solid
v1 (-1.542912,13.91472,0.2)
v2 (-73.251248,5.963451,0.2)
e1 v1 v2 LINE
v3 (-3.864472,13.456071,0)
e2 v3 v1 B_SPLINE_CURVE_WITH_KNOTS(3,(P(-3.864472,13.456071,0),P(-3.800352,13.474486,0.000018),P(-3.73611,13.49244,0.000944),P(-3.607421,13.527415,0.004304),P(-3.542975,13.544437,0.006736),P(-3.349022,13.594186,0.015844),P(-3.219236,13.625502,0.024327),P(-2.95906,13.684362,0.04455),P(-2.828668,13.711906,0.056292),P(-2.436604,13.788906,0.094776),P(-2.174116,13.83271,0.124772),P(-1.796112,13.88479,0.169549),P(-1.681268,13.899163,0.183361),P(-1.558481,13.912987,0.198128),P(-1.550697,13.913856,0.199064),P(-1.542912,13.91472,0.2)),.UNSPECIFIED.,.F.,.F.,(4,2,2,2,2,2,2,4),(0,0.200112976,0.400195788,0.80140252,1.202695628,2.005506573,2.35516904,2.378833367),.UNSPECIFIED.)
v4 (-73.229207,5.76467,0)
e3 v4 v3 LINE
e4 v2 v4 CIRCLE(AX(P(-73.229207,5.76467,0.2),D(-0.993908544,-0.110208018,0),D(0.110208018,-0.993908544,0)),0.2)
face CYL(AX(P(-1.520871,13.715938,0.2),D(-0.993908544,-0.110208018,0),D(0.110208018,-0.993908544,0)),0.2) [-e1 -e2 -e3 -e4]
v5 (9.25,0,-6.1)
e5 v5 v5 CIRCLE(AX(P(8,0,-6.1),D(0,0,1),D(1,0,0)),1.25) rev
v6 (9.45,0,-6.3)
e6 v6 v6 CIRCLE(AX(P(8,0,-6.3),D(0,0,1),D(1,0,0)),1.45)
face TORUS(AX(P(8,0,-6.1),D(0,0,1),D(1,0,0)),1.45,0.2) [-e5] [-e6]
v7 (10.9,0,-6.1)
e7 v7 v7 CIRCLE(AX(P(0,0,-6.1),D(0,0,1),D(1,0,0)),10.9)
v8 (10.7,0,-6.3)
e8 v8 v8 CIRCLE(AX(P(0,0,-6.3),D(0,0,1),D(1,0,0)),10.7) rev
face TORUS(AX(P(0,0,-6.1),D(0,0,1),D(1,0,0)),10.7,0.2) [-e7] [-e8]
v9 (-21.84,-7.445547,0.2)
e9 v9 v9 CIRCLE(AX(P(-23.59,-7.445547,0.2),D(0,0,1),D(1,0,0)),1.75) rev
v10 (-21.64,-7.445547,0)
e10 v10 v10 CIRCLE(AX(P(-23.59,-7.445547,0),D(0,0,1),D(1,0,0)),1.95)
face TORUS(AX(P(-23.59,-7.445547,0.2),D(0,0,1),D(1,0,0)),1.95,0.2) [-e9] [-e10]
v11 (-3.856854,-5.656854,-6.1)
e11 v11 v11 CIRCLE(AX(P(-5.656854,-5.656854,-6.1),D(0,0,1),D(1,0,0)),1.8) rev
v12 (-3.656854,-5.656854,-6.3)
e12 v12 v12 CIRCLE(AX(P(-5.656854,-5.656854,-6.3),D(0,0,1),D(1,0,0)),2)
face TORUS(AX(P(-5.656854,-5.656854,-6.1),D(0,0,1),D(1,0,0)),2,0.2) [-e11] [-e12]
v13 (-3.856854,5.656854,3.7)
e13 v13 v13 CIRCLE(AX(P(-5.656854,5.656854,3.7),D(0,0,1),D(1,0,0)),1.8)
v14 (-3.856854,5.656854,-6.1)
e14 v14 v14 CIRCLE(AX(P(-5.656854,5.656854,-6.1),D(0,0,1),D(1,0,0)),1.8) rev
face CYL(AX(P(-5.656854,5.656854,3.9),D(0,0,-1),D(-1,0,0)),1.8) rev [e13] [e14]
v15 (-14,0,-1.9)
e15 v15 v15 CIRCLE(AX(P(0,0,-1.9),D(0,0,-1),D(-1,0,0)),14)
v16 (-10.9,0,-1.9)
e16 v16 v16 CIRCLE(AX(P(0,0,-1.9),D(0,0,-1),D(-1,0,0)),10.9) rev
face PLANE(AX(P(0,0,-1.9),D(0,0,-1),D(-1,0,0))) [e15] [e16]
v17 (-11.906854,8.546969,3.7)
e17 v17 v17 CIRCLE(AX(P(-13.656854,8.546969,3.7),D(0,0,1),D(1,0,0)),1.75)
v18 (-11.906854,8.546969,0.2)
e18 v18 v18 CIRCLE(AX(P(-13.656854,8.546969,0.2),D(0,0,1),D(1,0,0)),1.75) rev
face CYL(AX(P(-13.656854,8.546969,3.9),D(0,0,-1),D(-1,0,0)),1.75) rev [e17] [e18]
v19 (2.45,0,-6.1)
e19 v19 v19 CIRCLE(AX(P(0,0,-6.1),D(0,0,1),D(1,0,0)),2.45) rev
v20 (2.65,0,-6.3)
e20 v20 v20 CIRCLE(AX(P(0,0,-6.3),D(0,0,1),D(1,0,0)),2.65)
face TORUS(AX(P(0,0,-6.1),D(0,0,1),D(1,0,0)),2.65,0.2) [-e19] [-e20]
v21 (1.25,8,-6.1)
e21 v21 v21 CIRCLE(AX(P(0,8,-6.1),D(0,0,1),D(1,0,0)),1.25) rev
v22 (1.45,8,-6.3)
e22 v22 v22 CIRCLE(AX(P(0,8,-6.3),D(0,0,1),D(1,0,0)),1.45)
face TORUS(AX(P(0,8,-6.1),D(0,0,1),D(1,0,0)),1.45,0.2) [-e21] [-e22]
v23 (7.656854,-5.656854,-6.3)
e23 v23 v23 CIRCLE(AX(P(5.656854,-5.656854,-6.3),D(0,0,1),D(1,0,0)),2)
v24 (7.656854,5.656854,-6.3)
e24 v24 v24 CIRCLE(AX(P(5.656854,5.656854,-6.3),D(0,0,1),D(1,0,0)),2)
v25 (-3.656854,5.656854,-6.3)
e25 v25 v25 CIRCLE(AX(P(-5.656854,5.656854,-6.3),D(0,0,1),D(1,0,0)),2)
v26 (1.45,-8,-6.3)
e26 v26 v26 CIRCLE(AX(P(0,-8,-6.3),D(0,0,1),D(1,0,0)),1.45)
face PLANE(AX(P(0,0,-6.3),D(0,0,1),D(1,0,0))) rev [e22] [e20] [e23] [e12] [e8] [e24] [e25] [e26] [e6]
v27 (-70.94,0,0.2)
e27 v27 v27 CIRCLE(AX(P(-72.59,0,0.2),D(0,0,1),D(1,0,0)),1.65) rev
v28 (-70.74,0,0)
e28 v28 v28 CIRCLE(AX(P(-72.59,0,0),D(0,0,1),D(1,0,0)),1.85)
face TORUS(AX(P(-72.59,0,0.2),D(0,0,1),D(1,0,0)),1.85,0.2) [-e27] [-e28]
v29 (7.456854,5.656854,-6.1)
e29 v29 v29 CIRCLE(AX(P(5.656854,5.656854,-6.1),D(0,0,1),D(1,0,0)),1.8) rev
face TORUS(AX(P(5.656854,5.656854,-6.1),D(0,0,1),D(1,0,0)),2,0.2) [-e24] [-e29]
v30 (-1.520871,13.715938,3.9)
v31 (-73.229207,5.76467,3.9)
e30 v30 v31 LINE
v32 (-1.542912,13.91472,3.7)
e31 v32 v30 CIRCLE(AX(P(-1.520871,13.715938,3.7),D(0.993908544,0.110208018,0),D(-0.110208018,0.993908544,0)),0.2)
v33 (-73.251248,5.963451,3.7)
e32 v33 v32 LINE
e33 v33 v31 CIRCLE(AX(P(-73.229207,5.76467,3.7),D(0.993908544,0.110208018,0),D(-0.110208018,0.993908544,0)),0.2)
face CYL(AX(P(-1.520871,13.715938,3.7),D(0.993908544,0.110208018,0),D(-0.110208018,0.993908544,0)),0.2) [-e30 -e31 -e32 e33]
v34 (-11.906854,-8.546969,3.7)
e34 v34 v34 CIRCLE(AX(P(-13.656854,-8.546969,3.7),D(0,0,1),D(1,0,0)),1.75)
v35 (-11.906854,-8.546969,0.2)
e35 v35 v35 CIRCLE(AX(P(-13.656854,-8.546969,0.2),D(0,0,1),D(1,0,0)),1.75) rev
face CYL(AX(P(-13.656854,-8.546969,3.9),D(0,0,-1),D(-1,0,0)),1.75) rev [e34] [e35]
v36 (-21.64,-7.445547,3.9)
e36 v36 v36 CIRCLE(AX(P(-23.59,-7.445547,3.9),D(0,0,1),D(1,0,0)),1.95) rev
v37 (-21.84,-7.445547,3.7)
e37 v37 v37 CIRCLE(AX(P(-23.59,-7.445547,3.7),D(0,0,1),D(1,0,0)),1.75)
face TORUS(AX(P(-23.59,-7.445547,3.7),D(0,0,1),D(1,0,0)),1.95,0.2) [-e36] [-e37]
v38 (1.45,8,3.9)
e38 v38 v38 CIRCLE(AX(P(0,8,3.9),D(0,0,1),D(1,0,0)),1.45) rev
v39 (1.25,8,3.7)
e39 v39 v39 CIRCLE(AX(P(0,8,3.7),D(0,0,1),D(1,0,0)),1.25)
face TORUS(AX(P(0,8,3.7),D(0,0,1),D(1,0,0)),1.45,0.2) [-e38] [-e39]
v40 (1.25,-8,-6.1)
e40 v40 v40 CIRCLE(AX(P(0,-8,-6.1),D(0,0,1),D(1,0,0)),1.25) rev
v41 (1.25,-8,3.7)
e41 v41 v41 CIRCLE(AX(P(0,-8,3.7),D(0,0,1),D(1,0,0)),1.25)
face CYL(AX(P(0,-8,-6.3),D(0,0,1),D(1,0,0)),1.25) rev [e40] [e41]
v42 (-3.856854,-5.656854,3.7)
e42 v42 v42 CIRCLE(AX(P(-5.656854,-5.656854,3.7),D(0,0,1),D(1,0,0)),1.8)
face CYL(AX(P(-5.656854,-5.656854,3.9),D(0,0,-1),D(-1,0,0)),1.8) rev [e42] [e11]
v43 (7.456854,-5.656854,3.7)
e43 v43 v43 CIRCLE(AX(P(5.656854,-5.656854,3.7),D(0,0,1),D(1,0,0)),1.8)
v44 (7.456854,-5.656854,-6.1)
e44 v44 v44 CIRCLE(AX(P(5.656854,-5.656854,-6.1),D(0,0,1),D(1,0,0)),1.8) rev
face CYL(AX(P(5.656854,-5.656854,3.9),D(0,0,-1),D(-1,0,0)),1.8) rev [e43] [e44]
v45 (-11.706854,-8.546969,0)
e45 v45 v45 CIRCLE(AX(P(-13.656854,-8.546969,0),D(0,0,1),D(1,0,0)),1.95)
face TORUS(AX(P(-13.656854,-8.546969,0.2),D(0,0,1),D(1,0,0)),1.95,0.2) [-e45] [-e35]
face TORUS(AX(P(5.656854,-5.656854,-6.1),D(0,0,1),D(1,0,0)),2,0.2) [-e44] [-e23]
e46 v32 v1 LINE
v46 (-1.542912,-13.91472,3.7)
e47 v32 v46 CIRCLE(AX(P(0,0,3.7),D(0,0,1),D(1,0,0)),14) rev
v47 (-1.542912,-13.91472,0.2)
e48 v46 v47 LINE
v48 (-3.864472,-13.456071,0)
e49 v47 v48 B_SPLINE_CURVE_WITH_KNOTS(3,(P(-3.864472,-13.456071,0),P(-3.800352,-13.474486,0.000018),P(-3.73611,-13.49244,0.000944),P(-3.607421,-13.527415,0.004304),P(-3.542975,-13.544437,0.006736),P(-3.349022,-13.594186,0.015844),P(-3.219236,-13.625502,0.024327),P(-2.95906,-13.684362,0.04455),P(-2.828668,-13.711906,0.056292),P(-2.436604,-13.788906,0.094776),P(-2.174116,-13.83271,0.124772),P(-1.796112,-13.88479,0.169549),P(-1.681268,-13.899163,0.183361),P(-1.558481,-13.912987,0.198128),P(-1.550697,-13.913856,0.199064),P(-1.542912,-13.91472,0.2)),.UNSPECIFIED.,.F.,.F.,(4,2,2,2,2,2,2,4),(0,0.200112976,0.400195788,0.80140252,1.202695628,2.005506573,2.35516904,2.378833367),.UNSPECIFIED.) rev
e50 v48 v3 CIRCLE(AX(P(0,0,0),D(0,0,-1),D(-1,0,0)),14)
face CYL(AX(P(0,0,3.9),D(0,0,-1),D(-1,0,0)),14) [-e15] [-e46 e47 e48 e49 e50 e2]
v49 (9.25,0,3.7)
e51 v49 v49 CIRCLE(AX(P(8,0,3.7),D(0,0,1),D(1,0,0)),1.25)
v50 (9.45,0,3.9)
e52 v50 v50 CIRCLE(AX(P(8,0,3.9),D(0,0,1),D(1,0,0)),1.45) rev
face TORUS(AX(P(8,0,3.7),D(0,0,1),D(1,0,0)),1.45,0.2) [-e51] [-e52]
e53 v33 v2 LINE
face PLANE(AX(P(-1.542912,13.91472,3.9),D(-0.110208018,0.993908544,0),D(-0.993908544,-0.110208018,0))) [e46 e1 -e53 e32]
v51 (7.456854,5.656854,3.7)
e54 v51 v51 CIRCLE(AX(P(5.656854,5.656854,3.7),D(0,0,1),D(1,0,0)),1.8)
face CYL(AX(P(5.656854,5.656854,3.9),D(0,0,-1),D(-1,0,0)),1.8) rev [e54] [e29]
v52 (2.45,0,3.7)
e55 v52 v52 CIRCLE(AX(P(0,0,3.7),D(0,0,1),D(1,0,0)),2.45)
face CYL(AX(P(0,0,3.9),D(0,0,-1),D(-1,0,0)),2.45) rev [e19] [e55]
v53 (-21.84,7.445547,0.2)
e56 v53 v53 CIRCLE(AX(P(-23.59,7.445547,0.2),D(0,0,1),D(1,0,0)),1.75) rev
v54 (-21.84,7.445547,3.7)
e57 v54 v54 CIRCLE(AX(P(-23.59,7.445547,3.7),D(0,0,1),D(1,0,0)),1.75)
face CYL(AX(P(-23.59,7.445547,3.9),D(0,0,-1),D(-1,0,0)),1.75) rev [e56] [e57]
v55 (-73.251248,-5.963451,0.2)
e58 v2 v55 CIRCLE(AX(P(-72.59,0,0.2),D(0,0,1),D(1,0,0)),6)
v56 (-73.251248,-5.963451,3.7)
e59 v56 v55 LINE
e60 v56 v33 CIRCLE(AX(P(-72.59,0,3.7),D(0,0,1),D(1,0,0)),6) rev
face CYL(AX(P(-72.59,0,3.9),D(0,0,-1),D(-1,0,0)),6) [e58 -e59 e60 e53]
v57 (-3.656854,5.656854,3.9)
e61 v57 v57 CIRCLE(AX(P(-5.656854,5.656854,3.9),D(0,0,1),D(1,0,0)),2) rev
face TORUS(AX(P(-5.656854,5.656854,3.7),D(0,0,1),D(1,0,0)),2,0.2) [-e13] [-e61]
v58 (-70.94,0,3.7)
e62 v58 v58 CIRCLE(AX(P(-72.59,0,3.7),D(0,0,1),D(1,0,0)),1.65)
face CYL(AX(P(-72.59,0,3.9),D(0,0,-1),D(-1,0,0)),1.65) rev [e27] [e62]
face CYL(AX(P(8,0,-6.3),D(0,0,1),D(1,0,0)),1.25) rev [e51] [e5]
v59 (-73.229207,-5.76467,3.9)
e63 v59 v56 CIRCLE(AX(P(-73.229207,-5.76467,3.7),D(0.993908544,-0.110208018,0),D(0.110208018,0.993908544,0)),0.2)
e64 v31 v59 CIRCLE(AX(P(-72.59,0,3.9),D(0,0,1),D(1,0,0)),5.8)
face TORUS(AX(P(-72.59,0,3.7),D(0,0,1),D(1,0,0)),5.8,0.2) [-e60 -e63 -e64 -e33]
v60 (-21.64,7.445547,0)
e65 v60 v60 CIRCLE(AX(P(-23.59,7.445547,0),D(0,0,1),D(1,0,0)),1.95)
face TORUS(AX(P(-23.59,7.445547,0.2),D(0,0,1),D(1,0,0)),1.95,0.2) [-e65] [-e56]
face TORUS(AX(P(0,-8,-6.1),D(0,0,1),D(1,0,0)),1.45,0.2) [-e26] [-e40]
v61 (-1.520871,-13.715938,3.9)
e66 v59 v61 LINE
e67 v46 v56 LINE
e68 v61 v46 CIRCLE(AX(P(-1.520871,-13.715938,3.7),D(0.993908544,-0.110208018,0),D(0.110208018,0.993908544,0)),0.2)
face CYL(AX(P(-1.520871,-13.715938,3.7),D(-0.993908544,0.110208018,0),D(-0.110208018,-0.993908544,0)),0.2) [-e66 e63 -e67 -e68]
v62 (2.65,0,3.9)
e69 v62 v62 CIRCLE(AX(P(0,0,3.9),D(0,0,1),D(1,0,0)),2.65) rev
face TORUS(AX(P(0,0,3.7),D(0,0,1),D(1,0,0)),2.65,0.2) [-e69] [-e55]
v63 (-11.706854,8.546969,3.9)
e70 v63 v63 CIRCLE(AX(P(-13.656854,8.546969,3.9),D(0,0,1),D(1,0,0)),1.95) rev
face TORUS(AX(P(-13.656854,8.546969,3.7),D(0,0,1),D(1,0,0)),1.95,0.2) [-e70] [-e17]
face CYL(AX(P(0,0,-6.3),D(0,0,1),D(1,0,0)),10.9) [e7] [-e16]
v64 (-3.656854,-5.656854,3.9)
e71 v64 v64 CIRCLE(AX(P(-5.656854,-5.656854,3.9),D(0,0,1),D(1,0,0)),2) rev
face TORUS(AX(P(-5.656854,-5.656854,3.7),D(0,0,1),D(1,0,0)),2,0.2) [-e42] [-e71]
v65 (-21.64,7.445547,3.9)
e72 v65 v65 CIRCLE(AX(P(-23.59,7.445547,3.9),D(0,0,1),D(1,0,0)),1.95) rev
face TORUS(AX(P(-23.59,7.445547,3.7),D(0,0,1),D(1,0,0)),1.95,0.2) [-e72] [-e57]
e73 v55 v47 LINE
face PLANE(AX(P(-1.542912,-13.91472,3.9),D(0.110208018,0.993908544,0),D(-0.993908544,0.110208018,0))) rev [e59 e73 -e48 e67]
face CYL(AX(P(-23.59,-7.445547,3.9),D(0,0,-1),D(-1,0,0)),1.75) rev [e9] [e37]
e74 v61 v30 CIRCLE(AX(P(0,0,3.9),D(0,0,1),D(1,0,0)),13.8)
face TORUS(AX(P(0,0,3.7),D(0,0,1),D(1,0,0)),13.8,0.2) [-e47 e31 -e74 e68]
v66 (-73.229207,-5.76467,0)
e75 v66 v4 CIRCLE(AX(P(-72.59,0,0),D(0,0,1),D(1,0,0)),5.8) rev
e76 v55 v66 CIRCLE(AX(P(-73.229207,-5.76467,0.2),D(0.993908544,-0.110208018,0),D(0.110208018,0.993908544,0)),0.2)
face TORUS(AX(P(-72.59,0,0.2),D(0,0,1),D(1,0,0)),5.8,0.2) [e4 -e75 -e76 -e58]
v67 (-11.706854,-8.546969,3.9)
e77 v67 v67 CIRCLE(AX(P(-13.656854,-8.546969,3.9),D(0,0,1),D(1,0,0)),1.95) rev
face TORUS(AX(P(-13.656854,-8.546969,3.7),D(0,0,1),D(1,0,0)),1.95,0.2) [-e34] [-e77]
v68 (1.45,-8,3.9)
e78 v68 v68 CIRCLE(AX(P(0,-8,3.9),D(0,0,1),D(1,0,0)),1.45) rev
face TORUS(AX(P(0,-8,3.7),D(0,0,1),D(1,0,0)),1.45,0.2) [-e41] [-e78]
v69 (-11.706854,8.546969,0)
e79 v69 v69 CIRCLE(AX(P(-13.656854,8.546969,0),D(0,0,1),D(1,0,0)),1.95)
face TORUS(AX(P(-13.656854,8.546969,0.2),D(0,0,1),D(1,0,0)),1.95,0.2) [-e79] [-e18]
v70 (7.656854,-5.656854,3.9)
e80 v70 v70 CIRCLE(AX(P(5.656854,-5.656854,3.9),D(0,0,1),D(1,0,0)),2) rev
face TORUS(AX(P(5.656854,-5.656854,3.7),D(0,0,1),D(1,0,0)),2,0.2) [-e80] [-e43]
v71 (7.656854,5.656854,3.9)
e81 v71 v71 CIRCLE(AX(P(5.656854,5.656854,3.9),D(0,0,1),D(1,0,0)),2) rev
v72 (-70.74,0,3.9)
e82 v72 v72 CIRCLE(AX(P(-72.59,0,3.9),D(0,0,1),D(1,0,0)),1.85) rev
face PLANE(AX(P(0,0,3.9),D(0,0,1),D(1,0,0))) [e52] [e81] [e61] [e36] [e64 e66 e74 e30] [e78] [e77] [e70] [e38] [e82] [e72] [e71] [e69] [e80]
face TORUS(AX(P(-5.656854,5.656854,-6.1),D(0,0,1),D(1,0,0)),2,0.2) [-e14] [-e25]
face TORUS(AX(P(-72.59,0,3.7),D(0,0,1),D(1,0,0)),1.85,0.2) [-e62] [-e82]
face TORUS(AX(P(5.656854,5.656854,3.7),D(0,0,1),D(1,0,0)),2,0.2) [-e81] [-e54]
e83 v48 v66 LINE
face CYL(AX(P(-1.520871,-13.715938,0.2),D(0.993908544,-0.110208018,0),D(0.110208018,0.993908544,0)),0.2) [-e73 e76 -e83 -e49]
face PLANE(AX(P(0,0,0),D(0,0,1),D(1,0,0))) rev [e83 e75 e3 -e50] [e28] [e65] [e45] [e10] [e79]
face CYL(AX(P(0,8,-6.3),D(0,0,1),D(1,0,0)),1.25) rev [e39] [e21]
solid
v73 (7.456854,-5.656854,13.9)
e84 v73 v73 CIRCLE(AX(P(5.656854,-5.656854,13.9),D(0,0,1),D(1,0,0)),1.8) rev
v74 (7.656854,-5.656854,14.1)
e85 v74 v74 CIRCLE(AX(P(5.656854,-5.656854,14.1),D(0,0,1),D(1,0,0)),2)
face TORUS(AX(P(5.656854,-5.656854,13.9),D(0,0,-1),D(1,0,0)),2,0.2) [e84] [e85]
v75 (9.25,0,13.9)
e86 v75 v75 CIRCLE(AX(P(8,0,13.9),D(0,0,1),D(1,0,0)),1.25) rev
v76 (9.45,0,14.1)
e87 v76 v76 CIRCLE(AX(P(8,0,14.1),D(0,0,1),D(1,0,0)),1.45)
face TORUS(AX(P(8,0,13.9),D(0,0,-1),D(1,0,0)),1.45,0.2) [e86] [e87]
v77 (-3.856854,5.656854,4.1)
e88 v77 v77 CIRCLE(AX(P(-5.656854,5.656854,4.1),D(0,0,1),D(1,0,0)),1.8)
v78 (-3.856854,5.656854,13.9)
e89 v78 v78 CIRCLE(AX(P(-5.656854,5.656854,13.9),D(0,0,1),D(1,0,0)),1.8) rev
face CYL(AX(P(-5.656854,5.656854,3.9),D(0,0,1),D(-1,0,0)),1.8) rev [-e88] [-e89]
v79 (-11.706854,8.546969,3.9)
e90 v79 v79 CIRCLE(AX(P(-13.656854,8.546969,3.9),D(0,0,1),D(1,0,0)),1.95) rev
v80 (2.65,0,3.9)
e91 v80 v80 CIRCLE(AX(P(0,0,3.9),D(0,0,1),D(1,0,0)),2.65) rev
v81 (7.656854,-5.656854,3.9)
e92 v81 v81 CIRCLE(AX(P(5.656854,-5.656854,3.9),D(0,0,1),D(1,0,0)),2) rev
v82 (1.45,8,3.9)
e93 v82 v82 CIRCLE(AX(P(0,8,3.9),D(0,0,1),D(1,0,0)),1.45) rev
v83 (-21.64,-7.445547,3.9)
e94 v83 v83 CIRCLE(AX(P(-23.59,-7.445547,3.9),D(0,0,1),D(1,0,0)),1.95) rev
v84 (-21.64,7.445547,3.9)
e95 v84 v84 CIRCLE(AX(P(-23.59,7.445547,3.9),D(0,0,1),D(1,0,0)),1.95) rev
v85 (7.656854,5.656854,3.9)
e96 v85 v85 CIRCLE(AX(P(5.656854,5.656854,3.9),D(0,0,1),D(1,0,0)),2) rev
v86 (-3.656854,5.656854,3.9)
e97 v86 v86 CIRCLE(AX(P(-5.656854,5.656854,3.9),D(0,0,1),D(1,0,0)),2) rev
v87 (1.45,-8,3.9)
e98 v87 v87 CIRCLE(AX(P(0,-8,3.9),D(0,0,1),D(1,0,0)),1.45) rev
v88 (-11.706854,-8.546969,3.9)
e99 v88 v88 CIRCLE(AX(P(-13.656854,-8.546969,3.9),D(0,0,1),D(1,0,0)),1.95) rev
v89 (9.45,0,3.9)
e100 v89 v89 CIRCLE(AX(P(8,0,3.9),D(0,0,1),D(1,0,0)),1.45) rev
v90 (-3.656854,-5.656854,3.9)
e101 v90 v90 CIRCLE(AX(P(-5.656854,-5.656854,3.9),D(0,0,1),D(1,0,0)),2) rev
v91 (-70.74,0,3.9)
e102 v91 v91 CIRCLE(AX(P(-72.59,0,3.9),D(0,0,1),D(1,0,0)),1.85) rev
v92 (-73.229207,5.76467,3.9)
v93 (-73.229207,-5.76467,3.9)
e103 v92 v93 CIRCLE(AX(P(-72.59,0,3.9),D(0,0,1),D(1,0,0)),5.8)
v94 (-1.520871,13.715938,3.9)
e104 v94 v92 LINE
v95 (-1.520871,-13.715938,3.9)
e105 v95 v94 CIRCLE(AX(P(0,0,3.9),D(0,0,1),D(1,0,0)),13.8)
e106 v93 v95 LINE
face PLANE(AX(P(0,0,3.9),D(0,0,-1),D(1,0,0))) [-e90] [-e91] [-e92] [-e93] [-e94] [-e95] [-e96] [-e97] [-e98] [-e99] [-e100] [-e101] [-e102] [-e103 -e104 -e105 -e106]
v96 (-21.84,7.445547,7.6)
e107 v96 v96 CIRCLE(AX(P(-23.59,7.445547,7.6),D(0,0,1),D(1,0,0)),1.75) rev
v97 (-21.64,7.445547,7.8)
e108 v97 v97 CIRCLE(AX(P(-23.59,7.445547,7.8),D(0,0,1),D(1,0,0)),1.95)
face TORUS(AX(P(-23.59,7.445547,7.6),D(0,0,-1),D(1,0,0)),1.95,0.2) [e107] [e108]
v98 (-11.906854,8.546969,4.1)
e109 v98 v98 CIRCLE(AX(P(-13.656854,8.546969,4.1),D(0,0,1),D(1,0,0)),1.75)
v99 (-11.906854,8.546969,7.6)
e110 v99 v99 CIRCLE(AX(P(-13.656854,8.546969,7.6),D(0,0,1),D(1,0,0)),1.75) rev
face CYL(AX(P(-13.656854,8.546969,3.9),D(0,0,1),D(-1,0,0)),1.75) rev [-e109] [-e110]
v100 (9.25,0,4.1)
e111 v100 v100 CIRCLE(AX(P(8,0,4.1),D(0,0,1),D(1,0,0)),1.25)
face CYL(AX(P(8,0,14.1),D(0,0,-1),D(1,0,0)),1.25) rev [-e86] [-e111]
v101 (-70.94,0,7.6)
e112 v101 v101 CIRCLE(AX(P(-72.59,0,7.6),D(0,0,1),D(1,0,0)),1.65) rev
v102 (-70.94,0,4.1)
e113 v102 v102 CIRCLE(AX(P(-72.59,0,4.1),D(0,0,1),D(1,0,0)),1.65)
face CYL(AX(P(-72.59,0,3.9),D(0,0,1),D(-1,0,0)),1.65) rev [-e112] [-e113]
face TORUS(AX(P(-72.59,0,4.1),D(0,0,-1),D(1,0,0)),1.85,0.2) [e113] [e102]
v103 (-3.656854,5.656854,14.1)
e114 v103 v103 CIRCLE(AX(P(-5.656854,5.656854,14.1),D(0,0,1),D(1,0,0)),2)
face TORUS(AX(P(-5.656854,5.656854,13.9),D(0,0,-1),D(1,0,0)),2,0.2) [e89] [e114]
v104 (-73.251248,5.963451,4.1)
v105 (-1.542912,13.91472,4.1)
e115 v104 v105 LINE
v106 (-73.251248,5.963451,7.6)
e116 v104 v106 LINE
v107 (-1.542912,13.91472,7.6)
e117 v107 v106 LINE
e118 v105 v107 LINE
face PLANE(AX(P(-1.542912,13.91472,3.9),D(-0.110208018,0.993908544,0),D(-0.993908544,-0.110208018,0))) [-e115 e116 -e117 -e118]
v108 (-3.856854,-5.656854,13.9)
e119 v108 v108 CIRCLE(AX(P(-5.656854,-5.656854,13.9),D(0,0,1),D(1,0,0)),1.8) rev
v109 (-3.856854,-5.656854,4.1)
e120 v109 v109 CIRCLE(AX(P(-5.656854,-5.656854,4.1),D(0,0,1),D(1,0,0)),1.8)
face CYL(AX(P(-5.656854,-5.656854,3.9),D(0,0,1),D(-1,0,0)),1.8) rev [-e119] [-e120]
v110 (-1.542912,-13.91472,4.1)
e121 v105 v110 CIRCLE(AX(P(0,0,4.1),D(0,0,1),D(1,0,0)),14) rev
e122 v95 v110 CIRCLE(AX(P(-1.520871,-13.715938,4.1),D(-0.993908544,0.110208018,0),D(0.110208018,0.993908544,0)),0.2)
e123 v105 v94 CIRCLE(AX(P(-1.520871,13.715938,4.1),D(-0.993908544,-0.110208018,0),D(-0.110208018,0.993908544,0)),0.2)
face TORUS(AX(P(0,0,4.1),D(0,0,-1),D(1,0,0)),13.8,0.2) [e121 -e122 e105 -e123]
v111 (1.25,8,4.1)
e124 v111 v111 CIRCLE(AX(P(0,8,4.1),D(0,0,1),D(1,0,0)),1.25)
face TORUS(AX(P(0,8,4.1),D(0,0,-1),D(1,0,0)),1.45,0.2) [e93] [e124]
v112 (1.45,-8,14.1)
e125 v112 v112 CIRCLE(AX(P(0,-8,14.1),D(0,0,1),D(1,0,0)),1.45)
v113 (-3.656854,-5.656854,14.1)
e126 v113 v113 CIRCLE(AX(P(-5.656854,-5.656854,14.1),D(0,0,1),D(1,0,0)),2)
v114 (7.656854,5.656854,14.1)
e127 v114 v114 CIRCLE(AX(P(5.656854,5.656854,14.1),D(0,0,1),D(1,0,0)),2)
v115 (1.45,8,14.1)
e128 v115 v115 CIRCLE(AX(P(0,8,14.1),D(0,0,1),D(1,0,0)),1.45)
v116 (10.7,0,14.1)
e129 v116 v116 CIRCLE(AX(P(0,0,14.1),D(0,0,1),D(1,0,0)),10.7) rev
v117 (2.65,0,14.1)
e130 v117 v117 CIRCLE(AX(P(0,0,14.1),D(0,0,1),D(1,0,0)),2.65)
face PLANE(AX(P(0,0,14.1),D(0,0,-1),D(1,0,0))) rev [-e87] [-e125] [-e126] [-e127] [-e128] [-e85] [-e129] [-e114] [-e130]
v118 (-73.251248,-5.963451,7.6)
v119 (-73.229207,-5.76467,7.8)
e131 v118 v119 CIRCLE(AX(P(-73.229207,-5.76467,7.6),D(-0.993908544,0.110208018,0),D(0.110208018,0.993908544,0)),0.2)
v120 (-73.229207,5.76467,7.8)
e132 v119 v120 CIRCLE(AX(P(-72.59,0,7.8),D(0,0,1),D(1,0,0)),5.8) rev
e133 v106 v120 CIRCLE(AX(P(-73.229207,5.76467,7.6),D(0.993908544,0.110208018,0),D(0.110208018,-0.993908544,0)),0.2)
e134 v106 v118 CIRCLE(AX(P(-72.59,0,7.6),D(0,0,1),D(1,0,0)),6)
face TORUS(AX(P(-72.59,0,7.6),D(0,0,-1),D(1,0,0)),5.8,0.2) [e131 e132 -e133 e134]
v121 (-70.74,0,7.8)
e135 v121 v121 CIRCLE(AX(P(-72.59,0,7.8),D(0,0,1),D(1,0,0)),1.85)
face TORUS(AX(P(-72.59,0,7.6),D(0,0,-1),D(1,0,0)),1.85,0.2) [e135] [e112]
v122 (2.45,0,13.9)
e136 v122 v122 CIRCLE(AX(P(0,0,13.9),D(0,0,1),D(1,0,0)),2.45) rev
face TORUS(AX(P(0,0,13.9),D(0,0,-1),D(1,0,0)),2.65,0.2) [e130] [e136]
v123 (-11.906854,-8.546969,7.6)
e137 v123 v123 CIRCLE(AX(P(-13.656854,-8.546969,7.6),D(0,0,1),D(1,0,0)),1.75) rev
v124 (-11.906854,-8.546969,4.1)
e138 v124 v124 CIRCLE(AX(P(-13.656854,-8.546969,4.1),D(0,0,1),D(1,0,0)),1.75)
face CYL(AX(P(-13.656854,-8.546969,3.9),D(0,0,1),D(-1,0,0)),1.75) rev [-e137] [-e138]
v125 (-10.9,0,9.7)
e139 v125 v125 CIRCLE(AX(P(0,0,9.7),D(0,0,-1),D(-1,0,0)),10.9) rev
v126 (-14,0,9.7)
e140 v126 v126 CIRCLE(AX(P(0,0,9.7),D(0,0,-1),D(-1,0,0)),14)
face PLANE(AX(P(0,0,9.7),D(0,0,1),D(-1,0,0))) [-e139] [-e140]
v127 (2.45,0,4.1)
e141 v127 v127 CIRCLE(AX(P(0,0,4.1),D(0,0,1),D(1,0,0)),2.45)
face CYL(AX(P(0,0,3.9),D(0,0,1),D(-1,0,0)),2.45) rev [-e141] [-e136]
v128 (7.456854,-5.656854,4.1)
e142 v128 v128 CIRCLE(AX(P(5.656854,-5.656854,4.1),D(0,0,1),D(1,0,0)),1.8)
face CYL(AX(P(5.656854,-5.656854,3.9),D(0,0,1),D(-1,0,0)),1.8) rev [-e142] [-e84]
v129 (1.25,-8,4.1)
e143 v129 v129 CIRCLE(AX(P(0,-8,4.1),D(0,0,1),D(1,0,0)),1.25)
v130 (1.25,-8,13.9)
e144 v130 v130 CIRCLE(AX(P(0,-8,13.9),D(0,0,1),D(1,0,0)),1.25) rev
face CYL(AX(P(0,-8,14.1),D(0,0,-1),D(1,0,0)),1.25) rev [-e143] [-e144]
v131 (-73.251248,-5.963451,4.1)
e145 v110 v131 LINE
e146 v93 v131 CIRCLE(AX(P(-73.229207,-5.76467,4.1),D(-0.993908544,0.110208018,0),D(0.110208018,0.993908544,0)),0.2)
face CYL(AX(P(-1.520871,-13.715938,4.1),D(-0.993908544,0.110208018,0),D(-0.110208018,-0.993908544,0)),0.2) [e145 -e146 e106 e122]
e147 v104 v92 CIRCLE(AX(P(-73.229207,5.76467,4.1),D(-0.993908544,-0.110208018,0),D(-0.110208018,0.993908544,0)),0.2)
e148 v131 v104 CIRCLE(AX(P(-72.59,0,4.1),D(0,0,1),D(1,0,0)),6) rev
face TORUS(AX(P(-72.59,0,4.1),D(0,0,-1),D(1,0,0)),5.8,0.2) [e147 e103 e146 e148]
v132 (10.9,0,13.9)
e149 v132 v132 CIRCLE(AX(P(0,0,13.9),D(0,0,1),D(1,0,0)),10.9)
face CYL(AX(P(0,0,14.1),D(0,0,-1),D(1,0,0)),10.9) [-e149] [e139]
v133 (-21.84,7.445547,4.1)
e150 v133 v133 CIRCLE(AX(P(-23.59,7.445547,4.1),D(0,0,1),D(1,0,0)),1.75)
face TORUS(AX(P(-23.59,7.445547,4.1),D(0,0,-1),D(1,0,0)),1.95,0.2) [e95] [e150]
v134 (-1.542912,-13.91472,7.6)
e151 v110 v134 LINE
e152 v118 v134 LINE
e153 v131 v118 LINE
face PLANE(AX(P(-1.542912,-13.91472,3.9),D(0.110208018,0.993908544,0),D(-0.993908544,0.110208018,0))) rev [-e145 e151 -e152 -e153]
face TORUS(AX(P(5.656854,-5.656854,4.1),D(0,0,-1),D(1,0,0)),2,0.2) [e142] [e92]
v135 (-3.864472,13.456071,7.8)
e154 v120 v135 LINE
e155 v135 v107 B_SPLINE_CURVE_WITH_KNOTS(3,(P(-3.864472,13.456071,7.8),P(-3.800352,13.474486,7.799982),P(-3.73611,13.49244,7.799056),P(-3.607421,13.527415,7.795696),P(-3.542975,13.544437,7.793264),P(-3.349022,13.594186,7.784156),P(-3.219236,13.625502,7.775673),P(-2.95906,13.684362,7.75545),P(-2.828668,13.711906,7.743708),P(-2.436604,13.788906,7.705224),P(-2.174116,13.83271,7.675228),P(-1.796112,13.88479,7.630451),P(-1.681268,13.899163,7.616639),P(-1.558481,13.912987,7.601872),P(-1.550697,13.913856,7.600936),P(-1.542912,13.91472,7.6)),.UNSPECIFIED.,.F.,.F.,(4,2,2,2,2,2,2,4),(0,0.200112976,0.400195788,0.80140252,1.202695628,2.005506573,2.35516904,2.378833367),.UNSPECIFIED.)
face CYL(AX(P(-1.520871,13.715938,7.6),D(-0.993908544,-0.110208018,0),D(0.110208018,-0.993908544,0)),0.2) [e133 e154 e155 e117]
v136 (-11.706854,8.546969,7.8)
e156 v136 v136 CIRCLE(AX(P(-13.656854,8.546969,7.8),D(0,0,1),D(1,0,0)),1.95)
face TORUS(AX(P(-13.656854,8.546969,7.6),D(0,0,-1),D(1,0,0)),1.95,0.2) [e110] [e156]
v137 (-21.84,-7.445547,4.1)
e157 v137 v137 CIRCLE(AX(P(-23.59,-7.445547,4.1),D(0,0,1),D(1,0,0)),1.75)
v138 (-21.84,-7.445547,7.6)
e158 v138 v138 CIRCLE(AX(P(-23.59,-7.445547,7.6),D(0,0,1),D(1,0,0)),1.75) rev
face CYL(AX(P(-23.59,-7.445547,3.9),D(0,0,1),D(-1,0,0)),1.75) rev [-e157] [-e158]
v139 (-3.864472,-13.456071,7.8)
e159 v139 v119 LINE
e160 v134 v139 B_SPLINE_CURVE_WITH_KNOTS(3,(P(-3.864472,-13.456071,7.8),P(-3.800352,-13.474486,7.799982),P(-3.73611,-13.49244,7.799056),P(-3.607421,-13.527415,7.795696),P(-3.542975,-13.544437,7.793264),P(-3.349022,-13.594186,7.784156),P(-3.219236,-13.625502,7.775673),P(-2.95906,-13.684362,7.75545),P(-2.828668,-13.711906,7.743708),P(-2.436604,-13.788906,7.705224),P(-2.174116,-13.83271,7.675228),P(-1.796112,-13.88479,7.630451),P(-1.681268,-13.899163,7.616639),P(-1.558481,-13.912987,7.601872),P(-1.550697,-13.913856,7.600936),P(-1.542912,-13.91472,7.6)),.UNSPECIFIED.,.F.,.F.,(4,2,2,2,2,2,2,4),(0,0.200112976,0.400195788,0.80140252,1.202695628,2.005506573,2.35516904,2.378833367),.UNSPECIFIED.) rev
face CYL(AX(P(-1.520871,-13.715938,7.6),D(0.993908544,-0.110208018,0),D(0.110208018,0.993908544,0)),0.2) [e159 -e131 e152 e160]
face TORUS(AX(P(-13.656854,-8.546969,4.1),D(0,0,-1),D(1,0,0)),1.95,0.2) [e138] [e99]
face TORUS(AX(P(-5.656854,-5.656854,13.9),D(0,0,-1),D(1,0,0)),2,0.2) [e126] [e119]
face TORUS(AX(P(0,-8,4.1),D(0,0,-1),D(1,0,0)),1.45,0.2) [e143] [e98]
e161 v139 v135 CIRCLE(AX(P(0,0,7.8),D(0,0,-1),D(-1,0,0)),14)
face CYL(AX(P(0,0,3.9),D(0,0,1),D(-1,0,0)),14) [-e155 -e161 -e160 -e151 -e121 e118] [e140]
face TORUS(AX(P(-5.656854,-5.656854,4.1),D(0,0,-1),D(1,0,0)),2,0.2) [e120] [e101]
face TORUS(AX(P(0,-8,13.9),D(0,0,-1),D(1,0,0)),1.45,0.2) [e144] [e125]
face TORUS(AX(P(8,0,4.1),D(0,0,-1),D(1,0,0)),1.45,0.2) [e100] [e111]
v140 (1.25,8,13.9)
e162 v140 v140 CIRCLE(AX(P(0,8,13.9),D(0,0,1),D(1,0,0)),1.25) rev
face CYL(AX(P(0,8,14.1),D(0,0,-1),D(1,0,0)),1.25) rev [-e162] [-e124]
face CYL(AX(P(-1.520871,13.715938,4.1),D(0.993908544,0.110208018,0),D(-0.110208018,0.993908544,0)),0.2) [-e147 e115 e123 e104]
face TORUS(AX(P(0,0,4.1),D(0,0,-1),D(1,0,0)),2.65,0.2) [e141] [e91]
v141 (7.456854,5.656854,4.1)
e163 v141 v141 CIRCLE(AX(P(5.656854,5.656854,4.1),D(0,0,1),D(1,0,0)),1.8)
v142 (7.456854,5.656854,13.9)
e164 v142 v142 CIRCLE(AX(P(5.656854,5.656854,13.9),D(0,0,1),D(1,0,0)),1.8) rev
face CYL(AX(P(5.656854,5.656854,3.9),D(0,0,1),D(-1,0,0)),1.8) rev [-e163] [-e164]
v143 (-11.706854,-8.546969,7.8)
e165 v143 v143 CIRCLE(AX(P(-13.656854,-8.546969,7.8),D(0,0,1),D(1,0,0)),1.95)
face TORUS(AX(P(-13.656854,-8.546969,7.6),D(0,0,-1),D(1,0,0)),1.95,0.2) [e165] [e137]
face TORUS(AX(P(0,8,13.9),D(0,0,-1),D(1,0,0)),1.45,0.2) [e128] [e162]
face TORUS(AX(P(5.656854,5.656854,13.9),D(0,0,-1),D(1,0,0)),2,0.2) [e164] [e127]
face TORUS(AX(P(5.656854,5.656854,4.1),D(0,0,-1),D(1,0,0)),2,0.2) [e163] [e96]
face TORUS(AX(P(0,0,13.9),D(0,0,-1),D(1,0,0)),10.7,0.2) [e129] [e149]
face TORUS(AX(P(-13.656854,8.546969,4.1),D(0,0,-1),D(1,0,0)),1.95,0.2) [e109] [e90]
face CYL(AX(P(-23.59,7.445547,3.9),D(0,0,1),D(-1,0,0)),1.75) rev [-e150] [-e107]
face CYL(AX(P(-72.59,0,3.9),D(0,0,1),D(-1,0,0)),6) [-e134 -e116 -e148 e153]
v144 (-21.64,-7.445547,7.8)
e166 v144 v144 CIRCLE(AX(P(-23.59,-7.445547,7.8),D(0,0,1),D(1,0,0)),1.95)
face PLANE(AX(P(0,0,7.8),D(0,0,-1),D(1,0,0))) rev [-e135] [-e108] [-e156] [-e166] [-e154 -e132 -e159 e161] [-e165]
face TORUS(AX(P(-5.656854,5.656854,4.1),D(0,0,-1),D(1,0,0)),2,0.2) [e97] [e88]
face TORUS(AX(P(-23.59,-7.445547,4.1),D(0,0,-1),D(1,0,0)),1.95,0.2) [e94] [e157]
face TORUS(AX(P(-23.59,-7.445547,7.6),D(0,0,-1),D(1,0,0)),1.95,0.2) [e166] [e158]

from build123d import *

# Parameters (mm, degrees)
SKETCH_1_R          = 1.7999999999999998
SKETCH_1_R_2        = 1.8000000000000007
SKETCH_1_R_3        = 1.6500000000000021
SKETCH_1_R_4        = 1.7500000000000004
SKETCH_1_R_5        = 1.7499999999999998
SKETCH_1_R_6        = 1.7500000000000009
EXTRUDE_1_DEPTH     = 3.9
EXTRUDE_START       = -6.300000000000001
SKETCH_1_6_R        = 10.9
SKETCH_1_6_R_2      = 1.7999999999999998
SKETCH_1_6_R_3      = 1.8000000000000007
SKETCH_1_6_R_4      = 4
EXTRUDE_2_DEPTH     = 6.300000000000001
EXTRUDE_START_2     = 1.9
SKETCH_3_R          = 10.9
EXTRUDE_3_DEPTH     = 1.9
SKETCH_4_R          = 2.45
CUT_EXTRUDE_2_DEPTH = 81.47625798954623
SKETCH_5_R          = 1.2499999999999998
SKETCH_5_R_2        = 1.2500000000000002
SKETCH_5_R_3        = 1.2499999999999991
CUT_EXTRUDE_3_DEPTH = 81.47625798954623
FILLET_2_R          = 0.2
FILLET_3_R          = 0.2


with BuildPart() as part:
    # 스케치1 → 보스-돌출1 (new body)
    with BuildSketch(Plane.XY):
        with BuildLine():
            Line((-73.25124810579969, 5.96345126102127), (-1.5429122468659604, 13.914719609049653))
            ThreePointArc((-1.5429122468659604, 13.914719609049653), (13.999999999999996, 3.11e-15), (-1.5429122468659573, -13.914719609049653))
            Line((-1.5429122468659573, -13.914719609049653), (-73.25124810579969, -5.963451261021289))
            ThreePointArc((-73.25124810579969, -5.963451261021289), (-78.59, -8.15e-15), (-73.25124810579969, 5.96345126102127))
        make_face()
        with Locations((5.656854249492369, 5.65685424949239)):
            Circle(SKETCH_1_R, mode=Mode.SUBTRACT)
        with Locations((5.65685424949239, -5.656854249492369)):
            Circle(SKETCH_1_R_2, mode=Mode.SUBTRACT)
        with Locations((-5.656854249492368, -5.656854249492391)):
            Circle(SKETCH_1_R, mode=Mode.SUBTRACT)
        with Locations((-5.656854249492391, 5.656854249492368)):
            Circle(SKETCH_1_R, mode=Mode.SUBTRACT)
        with Locations((-72.59, -8.89e-15)):
            Circle(SKETCH_1_R_3, mode=Mode.SUBTRACT)
        with Locations((-23.590000000000003, 7.445547090223239)):
            Circle(SKETCH_1_R_4, mode=Mode.SUBTRACT)
        with Locations((-13.656854249492396, 8.546968653787863)):
            Circle(SKETCH_1_R_5, mode=Mode.SUBTRACT)
        with Locations((-13.656854249492392, -8.546968653787866)):
            Circle(SKETCH_1_R_5, mode=Mode.SUBTRACT)
        with Locations((-23.590000000000003, -7.445547090223244)):
            Circle(SKETCH_1_R_6, mode=Mode.SUBTRACT)
    extrude(amount=EXTRUDE_1_DEPTH)

    # 스케치1<6> → 보스-돌출2 (add)
    # profile 1 of 2: a face of its own
    with BuildSketch(Plane.XY.offset(EXTRUDE_START)):
        Circle(SKETCH_1_6_R)
        with Locations((5.656854249492369, 5.65685424949239)):
            Circle(SKETCH_1_6_R_2, mode=Mode.SUBTRACT)
        with Locations((5.65685424949239, -5.656854249492369)):
            Circle(SKETCH_1_6_R_3, mode=Mode.SUBTRACT)
        with Locations((-5.656854249492368, -5.656854249492391)):
            Circle(SKETCH_1_6_R_2, mode=Mode.SUBTRACT)
        with Locations((-5.656854249492391, 5.656854249492368)):
            Circle(SKETCH_1_6_R_2, mode=Mode.SUBTRACT)
        Circle(SKETCH_1_6_R_4, mode=Mode.SUBTRACT)
    # profile 2 of 2: a face of its own
    with BuildSketch(Plane.XY.offset(EXTRUDE_START)):
        Circle(SKETCH_1_6_R_4)
    extrude(amount=EXTRUDE_2_DEPTH)

    # 스케치3 → 보스-돌출3 (add)
    with BuildSketch(Plane(origin=(0, 0, 0), x_dir=(-1, 0, 0), z_dir=(0, 0, -1)).offset(EXTRUDE_START_2)):
        with BuildLine():
            ThreePointArc((1.542912246865952, -13.914719609049655), (10.43074233830275, -9.33807337045166), (13.999999999999998, -3.43e-15))
            ThreePointArc((13.999999999999998, 0), (10.430742338302759, 9.338073370451651), (1.5429122468659615, 13.914719609049655))
            ThreePointArc((1.5429122468659602, 13.914719609049653), (-14, -2.2e-16), (1.5429122468659566, -13.914719609049659))
        make_face()
        with Locations(Location((0, 0, 0), (0, 0, 180))):
            Circle(SKETCH_3_R, mode=Mode.SUBTRACT)
    extrude(amount=-EXTRUDE_3_DEPTH)

    # 스케치4 → 컷-돌출2 (cut, through all)
    with BuildSketch(Plane(origin=(0, 0, -6.300000000000001), x_dir=(-1, 0, 0), z_dir=(0, 0, -1))):
        Circle(SKETCH_4_R)
    extrude(amount=-CUT_EXTRUDE_2_DEPTH, mode=Mode.SUBTRACT)

    # 스케치5 → 컷-돌출3 (cut, through all)
    with BuildSketch(Plane.XY.offset(3.9)):
        with Locations((7.3e-16, 8)):
            Circle(SKETCH_5_R)
        with Locations((2.69e-15, -8)):
            Circle(SKETCH_5_R_2)
        with Locations((8, 0)):
            Circle(SKETCH_5_R_3)
    extrude(amount=-CUT_EXTRUDE_3_DEPTH, mode=Mode.SUBTRACT)

    # 필렛2
    fillet_2_edges = [part.edges().sort_by_distance(p)[0] for p in [
        (-15.406854249492392, -8.546968653787866, 3.9),
        (-15.406854249492396, 8.546968653787863, 3.9),
        (-25.340000000000003, 7.445547090223239, 3.9),
        (-74.24000000000001, -9.42e-15, 3.9),
        (-37.39708017633283, 9.939085435035462, 3.9),
        (-78.59000000000002, -9.77e-15, 3.9),
        (-10.9, 1.33e-15, -6.300000000000001),
        (-7.456854249492391, 5.656854249492368, -6.300000000000001),
        (-7.456854249492368, -5.656854249492391, -6.300000000000001),
        (-37.39708017633283, -9.939085435035471, 3.9),
        (3.8568542494923896, -5.65685424949237, -6.300000000000001),
        (3.856854249492369, 5.65685424949239, -6.300000000000001),
        (13.999999999999998, 2e-15, 3.9),
        (-25.340000000000003, -7.445547090223244, 3.9),
        (-7.456854249492391, 5.656854249492368, 3.9),
        (-7.456854249492368, -5.656854249492391, 3.9),
        (2.45, 3e-16, 3.9000000000000004),
        (3.8568542494923896, -5.65685424949237, 3.9),
        (2.45, 3e-16, -6.300000000000001),
        (3.856854249492369, 5.65685424949239, 3.9),
        (-1.2499999999999991, 8, -6.300000000000001),
        (-1.2499999999999991, 8, 3.9),
        (6.750000000000001, 1.5e-16, -6.300000000000001),
        (6.750000000000001, 1.5e-16, 3.9),
        (-1.2499999999999976, -8, -6.300000000000001),
        (-1.2499999999999976, -8, 3.9),
    ]]
    fillet(fillet_2_edges, radius=FILLET_2_R)

    # 필렛3
    # the kernel refuses this fillet: 0.2 mm, written as the material it takes off along each edge
    with BuildSketch(Plane(origin=(-23.590000000000003, -7.445547090223244, 0), x_dir=(1, 0, 0), z_dir=(0, -1, 0))) as fillet_3_piece_1:
        with BuildLine():
            CenterArc((1.75 + FILLET_3_R, FILLET_3_R), FILLET_3_R, 180, 90)
            Line((1.75, FILLET_3_R), (1.75, 0))
            Line((1.75, 0), (1.75 + FILLET_3_R, 0))
        make_face()
    revolve(axis=Axis((-23.590000000000003, -7.445547090223244, 0), (0, 0, 1)), mode=Mode.SUBTRACT)
    with BuildSketch(Plane(origin=(-1.0459579751141845, -13.969823617866295, 0), x_dir=(0.11020801763328267, 0.993908543503547, 0), z_dir=(-0.993908543503547, 0.11020801763328267, 0))) as fillet_3_piece_2_section:
        with BuildLine():
            CenterArc((FILLET_3_R, -FILLET_3_R), FILLET_3_R, 90, 90)
            Line((0, -FILLET_3_R), (0, 0))
            Line((0, 0), (FILLET_3_R, 0))
        make_face()
    fillet_3_piece_2 = extrude(amount=72.64782117292246, mode=Mode.PRIVATE)
    fillet_3_piece_2 = fillet_3_piece_2 - Plane(origin=(4.4e-16, 8.9e-16, 0.0449378973195656), x_dir=(-0.11020801763328296, 0.993908543503547, 0), z_dir=(0, 0, -1)) * Cylinder(13.999999999999998, 147, mode=Mode.PRIVATE)
    add(fillet_3_piece_2, mode=Mode.SUBTRACT)
    with BuildSketch(Plane(origin=(-72.59000000000002, -9.55e-15, 0), x_dir=(-0.11020801763327874, -0.9939085435035473, 0), z_dir=(0.9939085435035473, -0.11020801763327874, 0))) as fillet_3_piece_3:
        with BuildLine():
            CenterArc((5.999999999999993 - FILLET_3_R, -FILLET_3_R), FILLET_3_R, 0, 90)
            Line((5.999999999999993 - FILLET_3_R, 3e-17), (5.999999999999993, 0))
            Line((5.999999999999993, 0), (5.999999999999993, -FILLET_3_R))
        make_face()
    revolve(axis=Axis((-72.59000000000002, -9.55e-15, 0), (0, 0, -1)), revolution_arc=167.34538598213177, mode=Mode.SUBTRACT)
    with BuildSketch(Plane(origin=(-73.25124810579969, 5.96345126102127, 0), x_dir=(0, 0, 1), z_dir=(0.9939085435035471, 0.11020801763328296, 0))) as fillet_3_piece_4_section:
        with BuildLine():
            CenterArc((FILLET_3_R, FILLET_3_R), FILLET_3_R, 180, 90)
            Line((-3e-17, FILLET_3_R), (0, 0))
            Line((0, 0), (FILLET_3_R, 0))
        make_face()
    fillet_3_piece_4 = extrude(amount=72.64782117292248, mode=Mode.PRIVATE)
    fillet_3_piece_4 = fillet_3_piece_4 - Plane(origin=(4.4e-16, 8.9e-16, 0.04493768276162775), x_dir=(-0.11020801763328296, 0.993908543503547, 0), z_dir=(0, 0, -1)) * Cylinder(13.999999999999998, 147, mode=Mode.PRIVATE)
    add(fillet_3_piece_4, mode=Mode.SUBTRACT)
    with BuildSketch(Plane(origin=(-72.59, -8.89e-15, 0), x_dir=(1, 0, 0), z_dir=(0, -1, 0))) as fillet_3_piece_5:
        with BuildLine():
            CenterArc((1.6500000000000057 + FILLET_3_R, FILLET_3_R), FILLET_3_R, 180, 90)
            Line((1.6500000000000057, FILLET_3_R), (1.6500000000000057, 0))
            Line((1.6500000000000057, 0), (1.6500000000000057 + FILLET_3_R, 0))
        make_face()
    revolve(axis=Axis((-72.59, -8.89e-15, 0), (0, 0, 1)), mode=Mode.SUBTRACT)
    with BuildSketch(Plane(origin=(-23.590000000000003, 7.445547090223239, 0), x_dir=(1, 0, 0), z_dir=(0, -1, 0))) as fillet_3_piece_6:
        with BuildLine():
            CenterArc((1.75 + FILLET_3_R, FILLET_3_R), FILLET_3_R, 180, 90)
            Line((1.75, FILLET_3_R), (1.75, 0))
            Line((1.75, 0), (1.75 + FILLET_3_R, 0))
        make_face()
    revolve(axis=Axis((-23.590000000000003, 7.445547090223239, 0), (0, 0, 1)), mode=Mode.SUBTRACT)
    with BuildSketch(Plane(origin=(-13.656854249492396, 8.546968653787863, 0), x_dir=(1, 0, 0), z_dir=(0, -1, 0))) as fillet_3_piece_7:
        with BuildLine():
            CenterArc((1.75 + FILLET_3_R, FILLET_3_R), FILLET_3_R, 180, 90)
            Line((1.7499999999999982, FILLET_3_R), (1.75, 0))
            Line((1.75, 0), (1.75 + FILLET_3_R, 0))
        make_face()
    revolve(axis=Axis((-13.656854249492396, 8.546968653787863, 0), (0, 0, 1)), mode=Mode.SUBTRACT)
    with BuildSketch(Plane(origin=(-13.656854249492392, -8.546968653787866, 0), x_dir=(1, 0, 0), z_dir=(0, -1, 0))) as fillet_3_piece_8:
        with BuildLine():
            CenterArc((1.75 + FILLET_3_R, FILLET_3_R), FILLET_3_R, 180, 90)
            Line((1.7500000000000018, FILLET_3_R), (1.75, 0))
            Line((1.75, 0), (1.75 + FILLET_3_R, 0))
        make_face()
    revolve(axis=Axis((-13.656854249492392, -8.546968653787866, 0), (0, 0, 1)), mode=Mode.SUBTRACT)


with BuildPart() as body_2:
    # 대칭 복사1: mirrored copy
    add(part.part.mirror(Plane.XY.offset(3.9)))


solid = Compound([part.part, body_2.part])
